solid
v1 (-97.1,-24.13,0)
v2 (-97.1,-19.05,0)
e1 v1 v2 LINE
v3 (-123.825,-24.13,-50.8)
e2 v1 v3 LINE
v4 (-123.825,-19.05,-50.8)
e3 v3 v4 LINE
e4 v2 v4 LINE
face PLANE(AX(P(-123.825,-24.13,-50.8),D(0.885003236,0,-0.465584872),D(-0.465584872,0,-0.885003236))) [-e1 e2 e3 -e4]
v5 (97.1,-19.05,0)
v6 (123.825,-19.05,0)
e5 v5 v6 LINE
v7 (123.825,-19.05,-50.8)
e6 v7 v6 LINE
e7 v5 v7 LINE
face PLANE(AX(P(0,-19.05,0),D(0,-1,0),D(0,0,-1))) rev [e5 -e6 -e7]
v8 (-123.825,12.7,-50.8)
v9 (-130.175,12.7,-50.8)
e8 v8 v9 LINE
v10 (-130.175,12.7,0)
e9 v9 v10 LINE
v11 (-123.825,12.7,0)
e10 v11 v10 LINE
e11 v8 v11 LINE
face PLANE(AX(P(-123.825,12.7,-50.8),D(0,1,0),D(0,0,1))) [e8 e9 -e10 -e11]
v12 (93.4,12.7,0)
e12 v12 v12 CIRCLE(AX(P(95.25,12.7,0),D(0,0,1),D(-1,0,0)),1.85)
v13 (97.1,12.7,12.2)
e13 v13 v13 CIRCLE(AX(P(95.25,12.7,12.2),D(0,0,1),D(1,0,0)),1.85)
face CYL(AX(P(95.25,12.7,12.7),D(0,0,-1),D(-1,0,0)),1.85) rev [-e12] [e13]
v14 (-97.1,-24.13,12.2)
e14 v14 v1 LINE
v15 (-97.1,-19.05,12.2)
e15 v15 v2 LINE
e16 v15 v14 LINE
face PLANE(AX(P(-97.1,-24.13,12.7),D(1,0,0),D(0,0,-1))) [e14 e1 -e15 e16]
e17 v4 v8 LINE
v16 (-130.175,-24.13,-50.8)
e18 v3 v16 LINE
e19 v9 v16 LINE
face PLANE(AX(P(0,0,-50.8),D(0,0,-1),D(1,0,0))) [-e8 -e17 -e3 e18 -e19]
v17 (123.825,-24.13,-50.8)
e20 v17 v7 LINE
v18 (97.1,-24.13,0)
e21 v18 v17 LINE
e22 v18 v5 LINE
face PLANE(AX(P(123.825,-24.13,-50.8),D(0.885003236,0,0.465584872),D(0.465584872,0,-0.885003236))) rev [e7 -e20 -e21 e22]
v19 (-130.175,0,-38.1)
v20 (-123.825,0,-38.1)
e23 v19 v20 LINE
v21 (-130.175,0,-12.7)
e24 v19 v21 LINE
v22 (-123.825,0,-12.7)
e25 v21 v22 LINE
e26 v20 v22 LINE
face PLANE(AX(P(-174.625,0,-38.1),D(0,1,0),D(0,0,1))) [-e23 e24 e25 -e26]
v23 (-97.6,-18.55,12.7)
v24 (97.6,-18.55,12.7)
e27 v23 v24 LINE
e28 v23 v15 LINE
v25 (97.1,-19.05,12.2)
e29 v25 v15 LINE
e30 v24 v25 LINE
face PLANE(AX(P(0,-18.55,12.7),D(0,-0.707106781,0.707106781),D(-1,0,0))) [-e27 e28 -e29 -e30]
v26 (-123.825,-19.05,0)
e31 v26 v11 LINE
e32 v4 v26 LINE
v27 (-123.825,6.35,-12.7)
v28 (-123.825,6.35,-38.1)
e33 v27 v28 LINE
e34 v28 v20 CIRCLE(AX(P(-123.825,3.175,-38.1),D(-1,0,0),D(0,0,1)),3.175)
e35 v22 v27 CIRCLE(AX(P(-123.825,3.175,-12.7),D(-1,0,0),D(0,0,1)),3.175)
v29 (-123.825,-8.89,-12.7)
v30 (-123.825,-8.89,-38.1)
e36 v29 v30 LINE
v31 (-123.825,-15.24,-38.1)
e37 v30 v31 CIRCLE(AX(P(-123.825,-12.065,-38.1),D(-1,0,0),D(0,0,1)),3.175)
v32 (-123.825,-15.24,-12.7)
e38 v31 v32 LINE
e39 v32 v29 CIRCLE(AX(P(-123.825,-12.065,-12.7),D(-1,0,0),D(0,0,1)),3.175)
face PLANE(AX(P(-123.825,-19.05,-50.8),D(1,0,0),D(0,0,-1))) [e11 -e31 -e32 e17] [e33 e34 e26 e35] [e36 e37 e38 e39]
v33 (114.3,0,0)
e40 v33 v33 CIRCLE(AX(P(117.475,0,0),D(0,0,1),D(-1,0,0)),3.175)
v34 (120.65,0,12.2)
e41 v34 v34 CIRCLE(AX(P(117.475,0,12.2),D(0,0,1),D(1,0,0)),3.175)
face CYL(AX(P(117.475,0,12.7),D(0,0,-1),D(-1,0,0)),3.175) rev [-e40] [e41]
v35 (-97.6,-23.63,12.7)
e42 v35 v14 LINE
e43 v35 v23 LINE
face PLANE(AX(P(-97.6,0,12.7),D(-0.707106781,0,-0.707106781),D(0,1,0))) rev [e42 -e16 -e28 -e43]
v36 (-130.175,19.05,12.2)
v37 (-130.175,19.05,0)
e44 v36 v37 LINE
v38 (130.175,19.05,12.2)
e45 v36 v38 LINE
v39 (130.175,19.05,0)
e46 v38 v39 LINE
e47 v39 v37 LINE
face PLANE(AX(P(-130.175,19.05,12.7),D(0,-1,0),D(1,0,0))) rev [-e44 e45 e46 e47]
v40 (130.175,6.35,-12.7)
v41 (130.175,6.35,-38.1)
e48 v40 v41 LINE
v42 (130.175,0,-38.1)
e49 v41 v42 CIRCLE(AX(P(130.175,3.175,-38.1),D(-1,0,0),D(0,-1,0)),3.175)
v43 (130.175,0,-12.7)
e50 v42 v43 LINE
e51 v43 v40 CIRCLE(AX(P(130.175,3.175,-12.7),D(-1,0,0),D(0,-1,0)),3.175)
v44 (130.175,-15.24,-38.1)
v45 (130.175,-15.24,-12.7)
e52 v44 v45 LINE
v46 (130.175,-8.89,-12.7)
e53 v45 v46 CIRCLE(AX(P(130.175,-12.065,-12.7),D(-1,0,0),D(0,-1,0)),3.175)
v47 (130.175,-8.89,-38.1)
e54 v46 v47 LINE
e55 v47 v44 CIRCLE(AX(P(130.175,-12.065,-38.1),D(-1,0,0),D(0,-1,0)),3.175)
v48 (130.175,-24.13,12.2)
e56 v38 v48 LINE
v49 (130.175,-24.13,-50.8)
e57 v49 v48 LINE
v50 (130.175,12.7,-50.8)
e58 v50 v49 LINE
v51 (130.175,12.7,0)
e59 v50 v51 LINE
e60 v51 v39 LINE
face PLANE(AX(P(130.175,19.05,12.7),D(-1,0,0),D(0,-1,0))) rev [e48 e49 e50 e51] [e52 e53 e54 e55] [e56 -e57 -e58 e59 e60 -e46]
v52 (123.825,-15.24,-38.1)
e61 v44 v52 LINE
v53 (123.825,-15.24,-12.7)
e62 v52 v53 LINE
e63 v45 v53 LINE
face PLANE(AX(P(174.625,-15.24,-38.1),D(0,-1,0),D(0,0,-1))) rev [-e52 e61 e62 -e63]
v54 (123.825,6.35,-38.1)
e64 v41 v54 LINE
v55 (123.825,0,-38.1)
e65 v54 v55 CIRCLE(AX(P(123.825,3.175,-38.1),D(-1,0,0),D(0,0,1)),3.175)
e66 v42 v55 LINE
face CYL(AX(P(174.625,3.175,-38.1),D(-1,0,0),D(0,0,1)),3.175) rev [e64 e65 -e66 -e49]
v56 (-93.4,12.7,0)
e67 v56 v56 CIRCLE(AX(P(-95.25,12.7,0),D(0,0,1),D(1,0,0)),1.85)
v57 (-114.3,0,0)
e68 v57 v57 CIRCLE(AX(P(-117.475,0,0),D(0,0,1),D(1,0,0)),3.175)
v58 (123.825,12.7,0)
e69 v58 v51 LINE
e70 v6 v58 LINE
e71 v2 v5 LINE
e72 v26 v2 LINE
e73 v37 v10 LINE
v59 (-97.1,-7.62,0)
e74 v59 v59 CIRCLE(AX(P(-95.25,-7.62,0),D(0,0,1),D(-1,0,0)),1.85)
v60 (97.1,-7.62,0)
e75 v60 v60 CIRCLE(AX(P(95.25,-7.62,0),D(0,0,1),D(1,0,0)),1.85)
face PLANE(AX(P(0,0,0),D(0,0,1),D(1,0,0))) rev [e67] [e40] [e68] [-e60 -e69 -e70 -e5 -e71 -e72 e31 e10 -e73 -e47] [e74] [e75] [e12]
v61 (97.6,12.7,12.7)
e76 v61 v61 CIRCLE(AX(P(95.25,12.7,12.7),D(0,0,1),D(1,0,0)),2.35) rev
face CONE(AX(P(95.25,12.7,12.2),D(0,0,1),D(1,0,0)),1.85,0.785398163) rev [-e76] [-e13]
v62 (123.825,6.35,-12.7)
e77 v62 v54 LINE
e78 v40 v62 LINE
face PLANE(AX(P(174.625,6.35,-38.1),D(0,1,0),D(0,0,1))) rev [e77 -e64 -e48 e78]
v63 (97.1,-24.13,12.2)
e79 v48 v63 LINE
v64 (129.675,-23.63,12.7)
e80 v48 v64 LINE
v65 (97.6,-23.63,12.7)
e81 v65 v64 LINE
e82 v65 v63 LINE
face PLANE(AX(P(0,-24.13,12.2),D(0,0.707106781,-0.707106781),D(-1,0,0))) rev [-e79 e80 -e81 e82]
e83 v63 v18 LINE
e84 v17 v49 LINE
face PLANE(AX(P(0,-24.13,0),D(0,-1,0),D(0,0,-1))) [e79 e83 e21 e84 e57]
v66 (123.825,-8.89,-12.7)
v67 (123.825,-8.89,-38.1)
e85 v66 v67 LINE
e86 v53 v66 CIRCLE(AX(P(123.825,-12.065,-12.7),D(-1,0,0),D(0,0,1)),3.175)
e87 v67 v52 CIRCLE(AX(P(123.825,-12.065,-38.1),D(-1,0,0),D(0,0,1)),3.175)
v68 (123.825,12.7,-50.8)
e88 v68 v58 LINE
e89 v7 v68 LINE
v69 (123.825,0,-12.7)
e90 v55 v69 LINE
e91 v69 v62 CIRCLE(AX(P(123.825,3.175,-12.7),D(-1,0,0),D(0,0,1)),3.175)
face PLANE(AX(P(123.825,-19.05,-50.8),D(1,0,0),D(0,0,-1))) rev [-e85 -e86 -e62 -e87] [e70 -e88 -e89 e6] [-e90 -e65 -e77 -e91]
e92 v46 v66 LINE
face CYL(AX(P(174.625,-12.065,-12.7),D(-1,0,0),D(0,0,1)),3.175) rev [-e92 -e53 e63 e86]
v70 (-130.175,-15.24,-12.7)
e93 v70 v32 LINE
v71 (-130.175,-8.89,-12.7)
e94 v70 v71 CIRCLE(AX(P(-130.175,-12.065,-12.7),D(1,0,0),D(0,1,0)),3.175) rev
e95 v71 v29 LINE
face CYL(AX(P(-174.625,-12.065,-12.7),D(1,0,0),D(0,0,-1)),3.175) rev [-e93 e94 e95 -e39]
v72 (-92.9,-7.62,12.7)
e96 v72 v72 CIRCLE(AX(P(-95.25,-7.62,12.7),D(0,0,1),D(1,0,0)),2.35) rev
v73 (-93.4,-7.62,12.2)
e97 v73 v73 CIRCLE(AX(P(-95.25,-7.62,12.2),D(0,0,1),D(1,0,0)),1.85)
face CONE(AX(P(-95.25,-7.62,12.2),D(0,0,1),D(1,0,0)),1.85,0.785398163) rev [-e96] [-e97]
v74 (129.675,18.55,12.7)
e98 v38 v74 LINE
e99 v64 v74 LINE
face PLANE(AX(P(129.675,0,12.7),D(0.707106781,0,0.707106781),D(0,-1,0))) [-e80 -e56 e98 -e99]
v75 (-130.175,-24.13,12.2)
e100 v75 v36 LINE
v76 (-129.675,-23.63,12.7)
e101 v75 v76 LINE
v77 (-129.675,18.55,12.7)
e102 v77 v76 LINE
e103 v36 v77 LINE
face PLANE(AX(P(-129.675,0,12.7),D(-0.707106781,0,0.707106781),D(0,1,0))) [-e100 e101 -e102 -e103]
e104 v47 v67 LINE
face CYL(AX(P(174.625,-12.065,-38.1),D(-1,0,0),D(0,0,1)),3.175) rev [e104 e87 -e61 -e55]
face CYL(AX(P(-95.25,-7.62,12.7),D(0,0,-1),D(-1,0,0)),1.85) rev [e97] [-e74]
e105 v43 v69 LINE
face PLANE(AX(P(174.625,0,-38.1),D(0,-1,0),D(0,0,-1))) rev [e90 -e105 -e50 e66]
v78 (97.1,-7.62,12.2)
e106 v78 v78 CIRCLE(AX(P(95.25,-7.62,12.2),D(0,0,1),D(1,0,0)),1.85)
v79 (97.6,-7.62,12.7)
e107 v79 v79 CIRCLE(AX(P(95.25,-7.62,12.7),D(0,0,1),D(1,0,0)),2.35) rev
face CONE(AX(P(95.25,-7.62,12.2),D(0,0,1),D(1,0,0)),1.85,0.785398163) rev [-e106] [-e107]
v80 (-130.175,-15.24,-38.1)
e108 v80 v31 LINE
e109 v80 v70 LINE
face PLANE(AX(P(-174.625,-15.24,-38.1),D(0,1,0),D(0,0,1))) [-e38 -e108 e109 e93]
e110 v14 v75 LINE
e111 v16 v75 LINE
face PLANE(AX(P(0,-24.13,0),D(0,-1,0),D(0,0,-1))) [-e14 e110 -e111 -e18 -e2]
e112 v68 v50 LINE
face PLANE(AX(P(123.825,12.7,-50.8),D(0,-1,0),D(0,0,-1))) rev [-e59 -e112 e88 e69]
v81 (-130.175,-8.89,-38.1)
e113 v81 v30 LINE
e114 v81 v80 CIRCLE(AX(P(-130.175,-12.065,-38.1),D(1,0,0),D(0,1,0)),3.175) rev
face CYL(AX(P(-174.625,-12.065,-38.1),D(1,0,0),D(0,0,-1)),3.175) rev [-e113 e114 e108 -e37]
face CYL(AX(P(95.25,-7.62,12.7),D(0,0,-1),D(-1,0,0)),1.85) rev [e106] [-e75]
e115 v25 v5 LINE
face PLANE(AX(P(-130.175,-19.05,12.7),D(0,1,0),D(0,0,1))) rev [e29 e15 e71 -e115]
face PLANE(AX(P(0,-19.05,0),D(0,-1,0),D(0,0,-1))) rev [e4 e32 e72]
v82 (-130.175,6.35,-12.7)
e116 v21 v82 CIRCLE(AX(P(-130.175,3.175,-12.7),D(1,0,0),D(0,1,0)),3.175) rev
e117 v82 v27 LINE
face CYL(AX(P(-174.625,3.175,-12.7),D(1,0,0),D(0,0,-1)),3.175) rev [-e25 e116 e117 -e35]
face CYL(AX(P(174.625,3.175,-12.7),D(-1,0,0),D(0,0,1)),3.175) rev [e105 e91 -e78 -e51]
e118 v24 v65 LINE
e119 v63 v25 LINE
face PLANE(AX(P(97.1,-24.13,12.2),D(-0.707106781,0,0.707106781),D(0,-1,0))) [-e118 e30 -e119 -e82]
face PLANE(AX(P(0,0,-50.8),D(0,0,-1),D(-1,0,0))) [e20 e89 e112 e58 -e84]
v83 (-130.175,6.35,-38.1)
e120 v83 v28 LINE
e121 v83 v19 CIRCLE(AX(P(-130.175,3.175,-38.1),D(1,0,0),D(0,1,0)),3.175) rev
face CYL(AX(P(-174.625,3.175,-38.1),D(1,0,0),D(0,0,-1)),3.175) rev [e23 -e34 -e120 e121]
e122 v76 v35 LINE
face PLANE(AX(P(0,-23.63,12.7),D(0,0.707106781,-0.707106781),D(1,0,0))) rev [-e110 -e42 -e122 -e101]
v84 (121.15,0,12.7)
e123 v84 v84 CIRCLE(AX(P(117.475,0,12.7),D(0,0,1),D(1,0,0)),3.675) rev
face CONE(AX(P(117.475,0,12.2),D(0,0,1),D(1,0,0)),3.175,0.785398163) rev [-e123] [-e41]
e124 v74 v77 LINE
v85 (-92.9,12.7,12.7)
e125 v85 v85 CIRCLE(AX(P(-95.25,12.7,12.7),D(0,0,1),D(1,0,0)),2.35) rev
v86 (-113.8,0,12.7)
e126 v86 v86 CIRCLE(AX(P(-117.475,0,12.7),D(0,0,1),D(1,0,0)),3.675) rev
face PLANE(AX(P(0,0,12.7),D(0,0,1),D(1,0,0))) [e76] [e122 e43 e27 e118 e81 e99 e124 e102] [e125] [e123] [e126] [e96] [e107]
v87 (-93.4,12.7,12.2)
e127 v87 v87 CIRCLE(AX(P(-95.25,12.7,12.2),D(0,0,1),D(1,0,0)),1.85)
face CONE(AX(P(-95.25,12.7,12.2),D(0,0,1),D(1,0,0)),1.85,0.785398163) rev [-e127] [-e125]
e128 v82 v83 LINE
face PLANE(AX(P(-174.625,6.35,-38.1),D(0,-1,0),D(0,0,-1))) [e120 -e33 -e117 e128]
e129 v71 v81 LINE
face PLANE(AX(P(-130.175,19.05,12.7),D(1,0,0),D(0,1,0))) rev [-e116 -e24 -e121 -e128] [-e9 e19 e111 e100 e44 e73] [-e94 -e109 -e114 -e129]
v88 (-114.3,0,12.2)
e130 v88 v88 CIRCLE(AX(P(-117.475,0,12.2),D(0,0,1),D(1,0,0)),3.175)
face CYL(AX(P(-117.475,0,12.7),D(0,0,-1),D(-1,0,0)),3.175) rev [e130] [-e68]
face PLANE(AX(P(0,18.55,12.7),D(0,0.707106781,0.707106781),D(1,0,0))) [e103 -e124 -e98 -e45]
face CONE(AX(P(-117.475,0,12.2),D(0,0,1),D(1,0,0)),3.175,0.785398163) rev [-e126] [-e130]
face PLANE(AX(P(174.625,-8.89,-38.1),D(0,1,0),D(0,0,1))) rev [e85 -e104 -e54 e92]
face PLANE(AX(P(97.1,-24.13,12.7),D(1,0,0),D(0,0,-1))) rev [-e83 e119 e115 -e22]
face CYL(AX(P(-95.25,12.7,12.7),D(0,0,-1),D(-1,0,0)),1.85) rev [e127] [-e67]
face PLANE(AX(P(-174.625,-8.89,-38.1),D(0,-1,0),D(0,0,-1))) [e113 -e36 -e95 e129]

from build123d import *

# Parameters (mm, degrees)
SKETCH1_W           = 260.35
SKETCH1_H           = 38.1
SKETCH1_R           = 3.175
SKETCH1_R_2         = 1.85
BOSS_EXTRUDE1_DEPTH = 12.7
SKETCH2_W           = 6.35
SKETCH2_H           = 31.75
BOSS_EXTRUDE2_DEPTH = 50.8
CUT_EXTRUDE1_DEPTH  = 50.8
BOSS_EXTRUDE3_DEPTH = 5.08
CHAMFER1_SIZE       = 0.5


with BuildPart() as part:
    # Sketch1 → Boss-Extrude1 (new body)
    with BuildSketch(Plane.XY):
        Rectangle(SKETCH1_W, SKETCH1_H)
        with Locations((-117.475, 0)):
            Circle(SKETCH1_R, mode=Mode.SUBTRACT)
        with Locations((117.475, 0)):
            Circle(SKETCH1_R, mode=Mode.SUBTRACT)
        with Locations((-95.25, 12.7)):
            Circle(SKETCH1_R_2, mode=Mode.SUBTRACT)
        with Locations((-95.25, -7.62)):
            Circle(SKETCH1_R_2, mode=Mode.SUBTRACT)
        with Locations((95.25, -7.62)):
            Circle(SKETCH1_R_2, mode=Mode.SUBTRACT)
        with Locations((95.25, 12.7)):
            Circle(SKETCH1_R_2, mode=Mode.SUBTRACT)
    boss_extrude1 = extrude(amount=BOSS_EXTRUDE1_DEPTH)

    # Sketch2 → Boss-Extrude2 (add)
    with BuildSketch(Plane(origin=(0, 0, 0), x_dir=(-1, 0, 0), z_dir=(0, 0, -1))):
        with Locations((-127, -3.175)):
            Rectangle(SKETCH2_W, SKETCH2_H)
    boss_extrude2 = extrude(amount=BOSS_EXTRUDE2_DEPTH)

    # Sketch3 → Cut-Extrude1 (cut)
    with BuildSketch(Plane.ZY.offset(-123.825)):
        with BuildLine():
            Line((-38.1, 6.35), (-12.7, 6.35))
            ThreePointArc((-12.7, 6.35), (-9.525, 3.175), (-12.7, 0))
            Line((-12.7, 0), (-38.1, 0))
            ThreePointArc((-38.1, 0), (-41.275, 3.175), (-38.1, 6.35))
        make_face()
        with BuildLine():
            Line((-38.1, -8.89), (-12.7, -8.89))
            ThreePointArc((-12.7, -8.89), (-9.525, -12.065), (-12.7, -15.24))
            Line((-12.7, -15.24), (-38.1, -15.24))
            ThreePointArc((-38.1, -15.24), (-41.275, -12.065), (-38.1, -8.89))
        make_face()
    cut_extrude1 = extrude(amount=-CUT_EXTRUDE1_DEPTH, mode=Mode.SUBTRACT)

    # Sketch4 → Boss-Extrude3 (add)
    with BuildSketch(Plane(origin=(0, -19.05, 0), x_dir=(-1, 0, 0), z_dir=(0, -1, 0))):
        Polygon((-123.825, 50.8), (-97.1, 0), (-97.1, -12.7), (-130.175, -12.7), (-130.175, 50.8), align=None)
    boss_extrude3 = extrude(amount=BOSS_EXTRUDE3_DEPTH)

    # Mirror1: Boss-Extrude1, Boss-Extrude2, Cut-Extrude1, Boss-Extrude3 across plane
    add(boss_extrude1.mirror(Plane(origin=(0, 0, 0), x_dir=(0, 0, 1), z_dir=(1, 0, 0))))
    add(boss_extrude2.mirror(Plane(origin=(0, 0, 0), x_dir=(0, 0, 1), z_dir=(1, 0, 0))))
    add(cut_extrude1.mirror(Plane(origin=(0, 0, 0), x_dir=(0, 0, 1), z_dir=(1, 0, 0))), mode=Mode.SUBTRACT)
    add(boss_extrude3.mirror(Plane(origin=(0, 0, 0), x_dir=(0, 0, 1), z_dir=(1, 0, 0))))

    # Chamfer1
    chamfer1_edges = [part.edges().sort_by_distance(p)[0] for p in [
        (93.4, 12.7, 12.7),
        (-97.1, 12.7, 12.7),
        (114.3, 0, 12.7),
        (-120.65, 0, 12.7),
        (-97.1, -7.62, 12.7),
        (93.4, -7.62, 12.7),
        (113.6375, -24.13, 12.7),
        (97.1, -21.59, 12.7),
        (0, -19.05, 12.7),
        (-97.1, -21.59, 12.7),
        (-113.6375, -24.13, 12.7),
        (-130.175, -2.54, 12.7),
        (0, 19.05, 12.7),
        (130.175, -2.54, 12.7),
    ]]
    chamfer(chamfer1_edges, length=CHAMFER1_SIZE)


solid = part.part
